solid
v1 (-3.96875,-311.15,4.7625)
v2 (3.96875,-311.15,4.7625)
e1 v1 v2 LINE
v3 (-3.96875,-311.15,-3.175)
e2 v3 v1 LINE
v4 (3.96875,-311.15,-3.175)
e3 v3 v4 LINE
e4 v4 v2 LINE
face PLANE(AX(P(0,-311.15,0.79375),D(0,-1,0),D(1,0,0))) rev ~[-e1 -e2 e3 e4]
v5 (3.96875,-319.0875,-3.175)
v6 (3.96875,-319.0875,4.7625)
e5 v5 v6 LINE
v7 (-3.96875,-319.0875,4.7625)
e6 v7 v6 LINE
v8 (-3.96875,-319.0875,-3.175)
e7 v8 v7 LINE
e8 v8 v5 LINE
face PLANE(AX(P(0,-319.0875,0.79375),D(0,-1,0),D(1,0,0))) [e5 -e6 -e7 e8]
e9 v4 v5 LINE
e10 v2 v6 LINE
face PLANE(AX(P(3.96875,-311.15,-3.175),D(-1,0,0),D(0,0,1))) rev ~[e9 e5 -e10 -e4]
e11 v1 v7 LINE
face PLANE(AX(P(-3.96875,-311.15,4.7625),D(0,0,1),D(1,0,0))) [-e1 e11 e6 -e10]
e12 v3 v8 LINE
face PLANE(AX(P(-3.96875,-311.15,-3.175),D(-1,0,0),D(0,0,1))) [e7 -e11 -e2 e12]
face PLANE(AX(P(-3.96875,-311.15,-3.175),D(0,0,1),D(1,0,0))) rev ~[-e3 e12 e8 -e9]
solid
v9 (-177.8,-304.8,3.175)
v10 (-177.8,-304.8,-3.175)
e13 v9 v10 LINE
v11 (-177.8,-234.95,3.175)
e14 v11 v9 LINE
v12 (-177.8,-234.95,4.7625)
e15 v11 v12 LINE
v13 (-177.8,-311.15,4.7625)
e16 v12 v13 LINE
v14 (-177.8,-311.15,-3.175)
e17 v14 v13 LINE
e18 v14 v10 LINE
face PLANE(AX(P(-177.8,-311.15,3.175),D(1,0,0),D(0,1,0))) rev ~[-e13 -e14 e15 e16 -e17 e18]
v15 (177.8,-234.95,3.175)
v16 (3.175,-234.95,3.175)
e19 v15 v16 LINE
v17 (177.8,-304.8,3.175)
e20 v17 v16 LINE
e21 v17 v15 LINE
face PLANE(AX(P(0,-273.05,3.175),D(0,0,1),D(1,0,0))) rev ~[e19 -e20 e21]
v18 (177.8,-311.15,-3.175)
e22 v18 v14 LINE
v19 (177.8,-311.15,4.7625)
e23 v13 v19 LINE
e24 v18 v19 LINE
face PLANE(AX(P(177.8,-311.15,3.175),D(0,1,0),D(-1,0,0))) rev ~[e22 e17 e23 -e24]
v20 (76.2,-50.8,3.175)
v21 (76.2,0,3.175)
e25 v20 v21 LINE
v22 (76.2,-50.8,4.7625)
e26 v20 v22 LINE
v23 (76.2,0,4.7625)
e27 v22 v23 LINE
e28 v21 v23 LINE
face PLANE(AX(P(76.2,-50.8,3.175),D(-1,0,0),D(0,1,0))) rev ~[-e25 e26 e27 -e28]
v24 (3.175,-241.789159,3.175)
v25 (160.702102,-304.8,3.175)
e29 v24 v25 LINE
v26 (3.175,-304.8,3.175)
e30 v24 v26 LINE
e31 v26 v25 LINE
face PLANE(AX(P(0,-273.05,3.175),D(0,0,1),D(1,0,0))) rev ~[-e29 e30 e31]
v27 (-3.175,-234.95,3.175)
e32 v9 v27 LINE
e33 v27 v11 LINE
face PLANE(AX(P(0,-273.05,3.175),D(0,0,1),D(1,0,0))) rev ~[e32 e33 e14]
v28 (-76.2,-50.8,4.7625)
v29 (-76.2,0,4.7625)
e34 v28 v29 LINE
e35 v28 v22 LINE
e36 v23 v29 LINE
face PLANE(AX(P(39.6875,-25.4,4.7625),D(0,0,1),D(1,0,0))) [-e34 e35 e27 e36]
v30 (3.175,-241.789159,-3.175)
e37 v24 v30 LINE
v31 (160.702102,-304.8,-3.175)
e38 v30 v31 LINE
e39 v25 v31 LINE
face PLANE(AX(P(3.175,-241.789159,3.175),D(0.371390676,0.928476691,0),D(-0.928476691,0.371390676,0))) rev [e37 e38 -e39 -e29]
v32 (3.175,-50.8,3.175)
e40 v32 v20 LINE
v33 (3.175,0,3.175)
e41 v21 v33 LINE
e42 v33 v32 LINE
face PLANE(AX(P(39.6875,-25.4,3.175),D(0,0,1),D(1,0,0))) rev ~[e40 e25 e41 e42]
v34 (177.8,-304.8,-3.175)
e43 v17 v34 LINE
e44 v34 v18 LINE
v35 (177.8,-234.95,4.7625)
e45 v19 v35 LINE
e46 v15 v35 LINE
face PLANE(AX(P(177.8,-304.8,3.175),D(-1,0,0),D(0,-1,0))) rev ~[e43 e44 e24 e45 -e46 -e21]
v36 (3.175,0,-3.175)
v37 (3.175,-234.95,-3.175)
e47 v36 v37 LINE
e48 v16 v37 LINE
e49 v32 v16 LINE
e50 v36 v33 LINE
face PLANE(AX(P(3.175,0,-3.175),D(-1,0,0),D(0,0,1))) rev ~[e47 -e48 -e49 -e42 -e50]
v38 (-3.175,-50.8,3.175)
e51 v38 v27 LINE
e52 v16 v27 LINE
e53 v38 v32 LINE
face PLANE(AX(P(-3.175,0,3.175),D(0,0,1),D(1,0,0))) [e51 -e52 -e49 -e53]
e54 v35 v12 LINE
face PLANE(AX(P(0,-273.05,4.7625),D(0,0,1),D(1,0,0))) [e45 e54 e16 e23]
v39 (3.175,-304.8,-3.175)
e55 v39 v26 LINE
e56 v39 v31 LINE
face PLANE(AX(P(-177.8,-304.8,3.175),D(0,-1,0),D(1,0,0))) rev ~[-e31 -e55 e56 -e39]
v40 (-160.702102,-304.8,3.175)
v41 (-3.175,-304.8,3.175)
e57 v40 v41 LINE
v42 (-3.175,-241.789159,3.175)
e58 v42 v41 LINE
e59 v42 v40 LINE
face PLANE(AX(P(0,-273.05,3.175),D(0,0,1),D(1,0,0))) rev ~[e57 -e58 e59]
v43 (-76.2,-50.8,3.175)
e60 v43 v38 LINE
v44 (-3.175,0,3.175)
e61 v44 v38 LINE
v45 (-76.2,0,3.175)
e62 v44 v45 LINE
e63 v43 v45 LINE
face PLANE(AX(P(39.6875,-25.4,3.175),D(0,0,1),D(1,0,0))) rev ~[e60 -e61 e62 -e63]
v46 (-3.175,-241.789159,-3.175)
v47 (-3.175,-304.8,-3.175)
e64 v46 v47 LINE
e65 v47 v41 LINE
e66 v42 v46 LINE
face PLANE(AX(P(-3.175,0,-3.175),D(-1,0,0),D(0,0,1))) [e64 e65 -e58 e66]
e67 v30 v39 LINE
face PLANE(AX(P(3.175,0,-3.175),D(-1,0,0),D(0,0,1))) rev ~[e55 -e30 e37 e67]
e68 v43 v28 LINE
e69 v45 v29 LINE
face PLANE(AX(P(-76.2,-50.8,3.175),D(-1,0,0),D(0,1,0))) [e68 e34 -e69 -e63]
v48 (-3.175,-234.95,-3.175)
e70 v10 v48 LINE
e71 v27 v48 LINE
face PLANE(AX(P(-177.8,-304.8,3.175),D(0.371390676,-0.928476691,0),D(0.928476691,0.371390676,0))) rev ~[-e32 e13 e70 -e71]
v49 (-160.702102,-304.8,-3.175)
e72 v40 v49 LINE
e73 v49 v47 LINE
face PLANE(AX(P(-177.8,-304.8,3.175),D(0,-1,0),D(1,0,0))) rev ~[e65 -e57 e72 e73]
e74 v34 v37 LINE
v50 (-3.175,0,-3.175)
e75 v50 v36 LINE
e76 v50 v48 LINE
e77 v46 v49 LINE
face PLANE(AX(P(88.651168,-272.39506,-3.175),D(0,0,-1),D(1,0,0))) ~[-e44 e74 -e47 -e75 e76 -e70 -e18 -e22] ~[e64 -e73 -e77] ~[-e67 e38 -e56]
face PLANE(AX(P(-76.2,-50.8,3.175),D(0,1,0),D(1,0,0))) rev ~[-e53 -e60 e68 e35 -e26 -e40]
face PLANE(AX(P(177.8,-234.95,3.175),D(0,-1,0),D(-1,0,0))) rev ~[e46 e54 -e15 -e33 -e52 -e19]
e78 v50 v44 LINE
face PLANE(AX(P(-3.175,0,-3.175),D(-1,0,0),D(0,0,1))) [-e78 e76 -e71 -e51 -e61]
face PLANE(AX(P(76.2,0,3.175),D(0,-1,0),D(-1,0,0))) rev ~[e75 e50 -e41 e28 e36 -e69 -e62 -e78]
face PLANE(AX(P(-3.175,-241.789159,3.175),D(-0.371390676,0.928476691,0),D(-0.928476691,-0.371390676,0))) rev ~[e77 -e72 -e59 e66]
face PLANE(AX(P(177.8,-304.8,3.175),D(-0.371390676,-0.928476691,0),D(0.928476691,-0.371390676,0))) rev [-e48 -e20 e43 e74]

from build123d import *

# Parameters (mm, degrees)
F0_W      = 6.35
F0_H      = 6.35
F1_DEPTH  = 304.8
F2_W      = 73.025
F2_H      = 50.8
F2_W_2    = 6.35
F3_DEPTH  = 1.5875
F4_W      = 6.35
F4_H      = 69.85
F5_DEPTH  = 1.5875
F7_DEPTH  = 6.35
F9_DEPTH  = 6.35
F11_W     = 7.9375
F11_H     = 7.9375
F12_DEPTH = 7.9375


# Not quite as in the source:
# - a length typed as a fraction of an inch, garbled in the dataset ("3 / 203.2 mm" for 3/8 in), is restored


with BuildPart() as f1:
    # F0 (on Front) → F1 (new body)
    with BuildSketch(Plane.XZ):
        Rectangle(F0_W, F0_H)
    extrude(amount=F1_DEPTH)

    # F2 (on face) → F3 (join)
    with BuildSketch(Plane.XY.offset(3.175)):
        with Locations((39.6875, -25.4)):
            Rectangle(F2_W, F2_H)
        with Locations((-39.6875, -25.4)):
            Rectangle(F2_W, F2_H)
        with Locations((0, -25.4)):
            Rectangle(F2_W_2, F2_H)
    extrude(amount=F3_DEPTH)

    # F4 (on face) → F5 (join)
    with BuildSketch(Plane.XY.offset(3.175)):
        Polygon((-3.175, -234.95), (-177.8, -234.95), (-177.8, -311.15), (177.8, -311.15), (177.8, -234.95), (3.175, -234.95), (3.175, -304.8), (-3.175, -304.8), align=None)
        with Locations((0, -269.875)):
            Rectangle(F4_W, F4_H)
    extrude(amount=F5_DEPTH)

    # F6 (on face) → F7 (join)
    with BuildSketch(Plane(origin=(0, 0, 3.175), x_dir=(1, 0, 0), z_dir=(0, 0, -1))):
        Polygon((-177.8, 311.15), (-177.8, 304.8), (-3.175, 304.8), (3.175, 304.8), (177.8, 304.8), (177.8, 311.15), align=None)
    extrude(amount=F7_DEPTH)

    # F8 (on face) → F9 (join)
    with BuildSketch(Plane(origin=(0, 0, 3.175), x_dir=(1, 0, 0), z_dir=(0, 0, -1))):
        Polygon((-177.8, 304.8), (-3.175, 234.95), (-3.175, 241.7891593051), (-160.7021017373, 304.8), align=None)
    extrude(amount=F9_DEPTH)

    # F10: F1 across plane


with BuildPart() as f1_1:
    add(f1.part)
    add(f1.part.mirror(Plane.YZ))


with BuildPart() as f12:
    # F11 (on face) → F12 (new body)
    with BuildSketch(Plane.XZ.offset(311.15)):
        with Locations((0, 0.79375)):
            Rectangle(F11_W, F11_H)
    extrude(amount=F12_DEPTH)


solid = Compound([f1_1.part, f12.part])
